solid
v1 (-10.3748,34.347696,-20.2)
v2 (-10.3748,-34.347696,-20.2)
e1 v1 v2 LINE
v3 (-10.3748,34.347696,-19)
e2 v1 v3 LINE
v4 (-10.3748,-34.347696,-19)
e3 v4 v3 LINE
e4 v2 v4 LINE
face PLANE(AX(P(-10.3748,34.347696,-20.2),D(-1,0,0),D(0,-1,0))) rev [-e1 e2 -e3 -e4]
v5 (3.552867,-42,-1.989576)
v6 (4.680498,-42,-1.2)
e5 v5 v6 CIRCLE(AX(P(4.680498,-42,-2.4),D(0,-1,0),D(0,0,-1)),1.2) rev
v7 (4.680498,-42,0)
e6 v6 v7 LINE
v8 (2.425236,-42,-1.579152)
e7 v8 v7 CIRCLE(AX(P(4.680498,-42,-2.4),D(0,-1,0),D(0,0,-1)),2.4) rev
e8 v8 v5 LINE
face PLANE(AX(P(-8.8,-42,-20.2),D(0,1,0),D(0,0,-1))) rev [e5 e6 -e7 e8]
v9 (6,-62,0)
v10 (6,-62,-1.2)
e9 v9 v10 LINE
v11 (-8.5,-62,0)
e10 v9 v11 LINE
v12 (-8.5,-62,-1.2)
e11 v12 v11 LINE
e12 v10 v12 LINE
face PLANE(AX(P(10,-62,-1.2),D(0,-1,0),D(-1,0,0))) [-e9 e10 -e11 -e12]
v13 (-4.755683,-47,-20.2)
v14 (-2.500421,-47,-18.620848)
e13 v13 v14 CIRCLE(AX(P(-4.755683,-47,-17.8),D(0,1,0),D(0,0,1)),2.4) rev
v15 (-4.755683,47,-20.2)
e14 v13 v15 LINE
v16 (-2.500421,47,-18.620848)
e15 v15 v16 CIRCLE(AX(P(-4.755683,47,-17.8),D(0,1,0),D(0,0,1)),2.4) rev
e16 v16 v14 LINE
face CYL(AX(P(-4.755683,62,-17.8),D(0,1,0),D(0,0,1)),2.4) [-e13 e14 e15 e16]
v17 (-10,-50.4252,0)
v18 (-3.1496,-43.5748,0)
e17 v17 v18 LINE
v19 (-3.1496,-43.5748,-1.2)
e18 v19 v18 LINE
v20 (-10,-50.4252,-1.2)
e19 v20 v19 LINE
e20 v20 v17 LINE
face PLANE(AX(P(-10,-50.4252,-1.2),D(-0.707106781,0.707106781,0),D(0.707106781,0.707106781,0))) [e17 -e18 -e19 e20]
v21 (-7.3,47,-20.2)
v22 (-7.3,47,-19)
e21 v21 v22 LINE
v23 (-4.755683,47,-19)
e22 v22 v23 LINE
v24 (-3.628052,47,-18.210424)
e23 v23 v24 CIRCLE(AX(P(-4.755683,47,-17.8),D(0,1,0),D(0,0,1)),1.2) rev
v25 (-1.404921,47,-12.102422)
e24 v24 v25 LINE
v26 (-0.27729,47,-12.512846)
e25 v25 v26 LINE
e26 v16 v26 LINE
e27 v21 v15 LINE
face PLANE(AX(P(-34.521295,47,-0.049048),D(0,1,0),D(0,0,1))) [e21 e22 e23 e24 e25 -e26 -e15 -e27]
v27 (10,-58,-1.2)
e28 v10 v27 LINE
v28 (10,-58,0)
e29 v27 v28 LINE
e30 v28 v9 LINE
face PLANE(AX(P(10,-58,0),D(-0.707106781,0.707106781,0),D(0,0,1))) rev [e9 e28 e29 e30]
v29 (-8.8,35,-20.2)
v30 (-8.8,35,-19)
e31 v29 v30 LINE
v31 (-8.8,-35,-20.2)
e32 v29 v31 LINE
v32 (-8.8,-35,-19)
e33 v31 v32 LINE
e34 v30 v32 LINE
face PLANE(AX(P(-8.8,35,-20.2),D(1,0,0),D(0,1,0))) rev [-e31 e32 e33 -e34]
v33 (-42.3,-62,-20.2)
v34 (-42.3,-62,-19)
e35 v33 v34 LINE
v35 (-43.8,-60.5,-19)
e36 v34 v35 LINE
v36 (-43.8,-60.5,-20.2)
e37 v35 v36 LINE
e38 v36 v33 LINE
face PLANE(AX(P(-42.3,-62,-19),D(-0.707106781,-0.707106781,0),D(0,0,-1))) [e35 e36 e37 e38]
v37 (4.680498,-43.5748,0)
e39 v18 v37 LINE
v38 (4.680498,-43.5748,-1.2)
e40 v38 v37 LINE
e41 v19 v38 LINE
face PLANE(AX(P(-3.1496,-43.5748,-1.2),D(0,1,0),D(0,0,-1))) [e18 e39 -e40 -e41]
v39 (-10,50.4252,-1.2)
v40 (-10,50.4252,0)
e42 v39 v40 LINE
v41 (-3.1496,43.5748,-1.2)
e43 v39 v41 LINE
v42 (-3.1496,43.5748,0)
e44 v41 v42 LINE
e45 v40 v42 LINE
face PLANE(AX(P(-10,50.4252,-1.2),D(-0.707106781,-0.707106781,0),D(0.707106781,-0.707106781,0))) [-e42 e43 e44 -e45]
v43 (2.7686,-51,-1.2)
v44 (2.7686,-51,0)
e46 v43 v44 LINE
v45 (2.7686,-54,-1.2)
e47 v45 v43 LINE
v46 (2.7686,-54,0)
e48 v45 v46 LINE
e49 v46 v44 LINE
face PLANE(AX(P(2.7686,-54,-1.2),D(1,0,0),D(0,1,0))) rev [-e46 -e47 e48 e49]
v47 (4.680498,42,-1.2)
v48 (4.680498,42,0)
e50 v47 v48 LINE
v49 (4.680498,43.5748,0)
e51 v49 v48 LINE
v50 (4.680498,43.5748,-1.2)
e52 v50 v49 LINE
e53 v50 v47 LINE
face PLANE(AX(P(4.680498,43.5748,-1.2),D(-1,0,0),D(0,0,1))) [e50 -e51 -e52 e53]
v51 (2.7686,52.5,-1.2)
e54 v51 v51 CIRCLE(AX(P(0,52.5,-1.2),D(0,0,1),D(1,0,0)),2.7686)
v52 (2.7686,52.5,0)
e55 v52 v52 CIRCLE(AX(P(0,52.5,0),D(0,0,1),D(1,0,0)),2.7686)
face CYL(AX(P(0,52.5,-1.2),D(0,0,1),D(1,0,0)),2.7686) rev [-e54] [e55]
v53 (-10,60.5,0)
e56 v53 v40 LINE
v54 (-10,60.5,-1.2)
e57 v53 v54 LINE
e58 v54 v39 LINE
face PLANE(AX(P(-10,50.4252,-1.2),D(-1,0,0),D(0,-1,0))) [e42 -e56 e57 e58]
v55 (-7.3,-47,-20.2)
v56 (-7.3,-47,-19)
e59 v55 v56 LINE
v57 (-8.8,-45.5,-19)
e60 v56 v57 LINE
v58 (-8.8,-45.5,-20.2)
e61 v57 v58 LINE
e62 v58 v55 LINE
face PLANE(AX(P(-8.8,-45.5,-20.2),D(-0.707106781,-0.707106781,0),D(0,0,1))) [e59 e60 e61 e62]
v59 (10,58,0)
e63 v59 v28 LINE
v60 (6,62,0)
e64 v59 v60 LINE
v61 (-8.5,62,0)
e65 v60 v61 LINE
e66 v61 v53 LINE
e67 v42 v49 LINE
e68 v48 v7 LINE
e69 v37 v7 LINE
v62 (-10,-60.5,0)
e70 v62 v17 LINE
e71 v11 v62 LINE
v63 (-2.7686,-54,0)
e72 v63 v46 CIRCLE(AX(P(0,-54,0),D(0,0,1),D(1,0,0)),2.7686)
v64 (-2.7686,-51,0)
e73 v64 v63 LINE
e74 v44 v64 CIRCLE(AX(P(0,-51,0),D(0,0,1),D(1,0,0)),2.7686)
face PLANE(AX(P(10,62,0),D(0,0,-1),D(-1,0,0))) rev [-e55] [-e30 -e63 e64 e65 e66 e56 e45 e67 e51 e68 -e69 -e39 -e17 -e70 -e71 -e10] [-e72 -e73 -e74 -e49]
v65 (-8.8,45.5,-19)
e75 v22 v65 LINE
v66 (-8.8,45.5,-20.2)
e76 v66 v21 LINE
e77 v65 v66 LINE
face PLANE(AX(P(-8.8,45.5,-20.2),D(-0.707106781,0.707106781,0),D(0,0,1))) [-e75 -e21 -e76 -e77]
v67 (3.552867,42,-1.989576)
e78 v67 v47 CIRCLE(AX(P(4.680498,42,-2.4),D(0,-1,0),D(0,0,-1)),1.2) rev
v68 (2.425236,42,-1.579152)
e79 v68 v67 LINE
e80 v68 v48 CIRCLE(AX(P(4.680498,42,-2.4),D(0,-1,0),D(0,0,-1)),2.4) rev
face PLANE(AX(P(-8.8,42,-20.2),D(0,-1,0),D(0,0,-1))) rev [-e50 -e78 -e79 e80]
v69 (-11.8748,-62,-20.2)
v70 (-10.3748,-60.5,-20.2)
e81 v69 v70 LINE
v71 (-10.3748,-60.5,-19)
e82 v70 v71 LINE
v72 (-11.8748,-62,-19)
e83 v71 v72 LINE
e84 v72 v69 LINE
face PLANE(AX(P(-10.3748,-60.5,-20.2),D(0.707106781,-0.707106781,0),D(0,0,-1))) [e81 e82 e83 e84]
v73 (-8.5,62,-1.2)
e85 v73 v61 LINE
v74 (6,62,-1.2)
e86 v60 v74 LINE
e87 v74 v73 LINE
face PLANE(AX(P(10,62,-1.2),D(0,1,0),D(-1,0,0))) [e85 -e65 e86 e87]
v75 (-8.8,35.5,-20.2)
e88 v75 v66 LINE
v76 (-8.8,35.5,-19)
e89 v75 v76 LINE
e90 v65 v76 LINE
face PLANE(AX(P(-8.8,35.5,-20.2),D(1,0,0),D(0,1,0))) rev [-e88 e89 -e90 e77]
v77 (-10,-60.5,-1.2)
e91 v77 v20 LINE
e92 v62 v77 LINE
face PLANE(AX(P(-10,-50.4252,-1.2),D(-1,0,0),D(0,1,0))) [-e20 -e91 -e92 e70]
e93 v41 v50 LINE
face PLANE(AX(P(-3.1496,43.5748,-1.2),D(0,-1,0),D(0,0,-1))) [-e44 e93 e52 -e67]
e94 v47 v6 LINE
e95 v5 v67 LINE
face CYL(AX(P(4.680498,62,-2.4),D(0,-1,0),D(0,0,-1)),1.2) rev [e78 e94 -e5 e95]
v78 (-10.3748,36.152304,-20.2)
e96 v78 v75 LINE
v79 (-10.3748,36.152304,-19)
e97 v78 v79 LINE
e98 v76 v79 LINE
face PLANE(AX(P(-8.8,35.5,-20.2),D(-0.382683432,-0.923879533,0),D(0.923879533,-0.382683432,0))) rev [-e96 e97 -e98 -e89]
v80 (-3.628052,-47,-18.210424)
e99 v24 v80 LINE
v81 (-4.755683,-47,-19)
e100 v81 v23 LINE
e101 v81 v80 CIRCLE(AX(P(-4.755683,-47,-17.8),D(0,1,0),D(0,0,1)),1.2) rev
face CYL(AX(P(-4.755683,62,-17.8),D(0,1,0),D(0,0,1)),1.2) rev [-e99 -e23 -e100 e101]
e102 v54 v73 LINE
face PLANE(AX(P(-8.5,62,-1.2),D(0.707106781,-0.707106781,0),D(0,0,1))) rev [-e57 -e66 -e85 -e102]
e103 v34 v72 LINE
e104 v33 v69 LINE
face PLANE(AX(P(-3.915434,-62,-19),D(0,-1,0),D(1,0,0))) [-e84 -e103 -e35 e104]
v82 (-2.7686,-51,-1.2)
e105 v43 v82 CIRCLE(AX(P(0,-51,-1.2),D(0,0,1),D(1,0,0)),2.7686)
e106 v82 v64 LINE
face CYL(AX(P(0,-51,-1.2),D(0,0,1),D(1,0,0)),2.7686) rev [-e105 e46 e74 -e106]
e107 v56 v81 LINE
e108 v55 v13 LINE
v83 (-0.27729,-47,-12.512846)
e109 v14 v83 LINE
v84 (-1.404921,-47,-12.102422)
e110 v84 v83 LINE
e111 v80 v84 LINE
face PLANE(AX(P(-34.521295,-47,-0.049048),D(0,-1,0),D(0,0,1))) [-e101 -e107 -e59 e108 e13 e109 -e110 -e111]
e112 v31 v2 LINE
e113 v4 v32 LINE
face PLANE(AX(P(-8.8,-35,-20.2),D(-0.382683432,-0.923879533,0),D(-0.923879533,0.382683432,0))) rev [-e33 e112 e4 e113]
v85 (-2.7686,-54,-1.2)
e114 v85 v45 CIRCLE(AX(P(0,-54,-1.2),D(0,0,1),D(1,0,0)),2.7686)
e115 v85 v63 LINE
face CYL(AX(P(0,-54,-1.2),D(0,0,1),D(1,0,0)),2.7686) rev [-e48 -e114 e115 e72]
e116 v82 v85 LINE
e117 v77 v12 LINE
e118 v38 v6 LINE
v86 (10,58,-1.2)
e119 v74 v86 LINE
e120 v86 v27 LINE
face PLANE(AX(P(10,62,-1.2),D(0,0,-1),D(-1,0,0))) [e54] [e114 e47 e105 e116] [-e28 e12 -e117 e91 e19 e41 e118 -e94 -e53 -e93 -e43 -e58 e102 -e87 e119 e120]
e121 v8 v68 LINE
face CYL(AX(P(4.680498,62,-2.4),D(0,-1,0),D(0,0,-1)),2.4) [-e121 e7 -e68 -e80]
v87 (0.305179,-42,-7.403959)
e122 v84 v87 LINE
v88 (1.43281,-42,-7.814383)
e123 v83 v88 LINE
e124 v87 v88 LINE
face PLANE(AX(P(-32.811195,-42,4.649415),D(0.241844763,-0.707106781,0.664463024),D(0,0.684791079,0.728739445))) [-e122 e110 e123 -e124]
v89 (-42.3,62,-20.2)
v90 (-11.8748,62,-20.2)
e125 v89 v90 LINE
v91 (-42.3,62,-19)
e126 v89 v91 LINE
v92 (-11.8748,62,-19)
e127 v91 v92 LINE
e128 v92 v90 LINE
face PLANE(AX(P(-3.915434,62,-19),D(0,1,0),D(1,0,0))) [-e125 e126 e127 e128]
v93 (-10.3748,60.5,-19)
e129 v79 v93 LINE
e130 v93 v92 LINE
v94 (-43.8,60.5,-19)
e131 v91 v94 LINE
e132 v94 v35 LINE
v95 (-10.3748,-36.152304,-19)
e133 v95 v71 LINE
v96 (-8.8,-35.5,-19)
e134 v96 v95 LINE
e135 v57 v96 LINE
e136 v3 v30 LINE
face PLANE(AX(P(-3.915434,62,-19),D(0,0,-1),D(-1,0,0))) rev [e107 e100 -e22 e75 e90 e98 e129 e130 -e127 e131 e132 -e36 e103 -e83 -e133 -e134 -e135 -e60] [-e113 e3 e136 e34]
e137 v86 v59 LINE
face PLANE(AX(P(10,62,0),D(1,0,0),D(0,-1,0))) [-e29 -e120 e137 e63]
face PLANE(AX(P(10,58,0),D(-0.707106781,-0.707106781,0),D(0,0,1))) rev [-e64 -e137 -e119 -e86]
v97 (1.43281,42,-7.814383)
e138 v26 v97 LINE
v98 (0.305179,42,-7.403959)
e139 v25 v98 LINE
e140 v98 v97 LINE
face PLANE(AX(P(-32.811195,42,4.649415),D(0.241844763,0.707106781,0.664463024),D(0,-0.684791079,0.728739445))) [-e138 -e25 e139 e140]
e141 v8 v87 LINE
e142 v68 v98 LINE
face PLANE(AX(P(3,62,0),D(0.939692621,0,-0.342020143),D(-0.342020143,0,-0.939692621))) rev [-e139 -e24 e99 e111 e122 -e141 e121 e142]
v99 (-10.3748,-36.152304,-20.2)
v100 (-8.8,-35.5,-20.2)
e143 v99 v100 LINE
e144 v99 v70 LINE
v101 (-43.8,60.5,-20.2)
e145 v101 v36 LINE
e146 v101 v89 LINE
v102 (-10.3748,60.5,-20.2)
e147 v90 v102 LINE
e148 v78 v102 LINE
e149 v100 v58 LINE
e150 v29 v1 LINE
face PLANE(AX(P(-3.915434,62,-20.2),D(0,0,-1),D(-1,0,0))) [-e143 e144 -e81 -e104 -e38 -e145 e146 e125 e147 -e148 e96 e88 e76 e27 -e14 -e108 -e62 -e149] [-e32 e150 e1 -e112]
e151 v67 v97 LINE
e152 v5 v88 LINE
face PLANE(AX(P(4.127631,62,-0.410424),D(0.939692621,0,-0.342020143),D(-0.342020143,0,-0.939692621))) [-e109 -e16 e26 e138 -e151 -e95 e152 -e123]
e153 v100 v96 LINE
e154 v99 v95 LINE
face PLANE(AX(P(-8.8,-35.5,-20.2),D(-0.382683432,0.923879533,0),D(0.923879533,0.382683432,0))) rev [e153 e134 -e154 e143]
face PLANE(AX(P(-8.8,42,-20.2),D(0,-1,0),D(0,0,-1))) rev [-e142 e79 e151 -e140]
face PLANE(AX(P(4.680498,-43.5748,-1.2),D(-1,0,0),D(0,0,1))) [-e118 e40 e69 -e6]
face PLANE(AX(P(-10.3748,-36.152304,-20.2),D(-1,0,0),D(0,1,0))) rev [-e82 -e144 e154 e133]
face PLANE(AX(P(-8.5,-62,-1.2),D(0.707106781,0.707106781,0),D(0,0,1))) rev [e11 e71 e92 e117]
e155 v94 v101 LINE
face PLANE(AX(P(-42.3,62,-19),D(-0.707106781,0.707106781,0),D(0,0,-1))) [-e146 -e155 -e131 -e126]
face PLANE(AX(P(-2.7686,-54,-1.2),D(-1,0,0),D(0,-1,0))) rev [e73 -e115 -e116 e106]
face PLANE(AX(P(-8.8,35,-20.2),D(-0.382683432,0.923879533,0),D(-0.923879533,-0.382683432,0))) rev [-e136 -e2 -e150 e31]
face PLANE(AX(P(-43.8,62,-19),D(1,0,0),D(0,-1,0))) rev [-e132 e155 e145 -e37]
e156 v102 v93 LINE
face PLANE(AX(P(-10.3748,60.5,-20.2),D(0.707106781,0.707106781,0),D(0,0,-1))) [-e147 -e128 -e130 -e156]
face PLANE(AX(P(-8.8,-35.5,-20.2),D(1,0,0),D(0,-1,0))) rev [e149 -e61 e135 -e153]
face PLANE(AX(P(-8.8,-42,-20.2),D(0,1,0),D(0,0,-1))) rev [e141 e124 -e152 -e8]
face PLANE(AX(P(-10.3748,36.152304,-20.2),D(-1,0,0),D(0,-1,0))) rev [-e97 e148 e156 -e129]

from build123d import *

# Parameters (mm, degrees)
BOSS_EXTRUDE1_DEPTH            = 62
CONVERT_SOLID1_DEPTH           = 62
CONVERT_SOLID1_2_DEPTH         = 62
CUT_EXTRUDE2_DEPTH             = 79.552402891
SKETCH9_W                      = 18.8
SKETCH9_H                      = 20
CUT_EXTRUDE3_DEPTH             = 79.552402891
BOSS_EXTRUDE3_DEPTH            = 1.2
BOSS_EXTRUDE4_DEPTH            = 20
CUT_EXTRUDE4_DEPTH             = 20.58
CUT_EXTRUDE4_DIRECTION_2_REACH = 81.822
CHAMFER4_SIZE                  = 4
CHAMFER1_SIZE                  = 1.5
SKETCH7_R                      = 2.7686
CUT_EXTRUDE1_DEPTH             = 1.2


# Read off the part's stored shape, not the designer's step: Convert-Solid1
with BuildPart() as part:
    # Sketch2 → Boss-Extrude1 (new body)
    with BuildSketch(Plane(origin=(0, 0, 0), x_dir=(1, 0, 0), z_dir=(0, 1, 0))):
        Polygon((10, 0), (3, 0), (-3.915434451, 19), (-43.8, 19), (-43.8, 40), (10, 40), align=None)
    extrude(amount=BOSS_EXTRUDE1_DEPTH)

    # Convert-Solid1 outline → Convert-Solid1 (cut)
    with BuildSketch(Plane(origin=(0, 0, 0), x_dir=(1, 0, 0), z_dir=(0, 1, 0))):
        with BuildLine():
            ThreePointArc((4.680498092, 0), (3.303914645, 0.434035094), (2.425235802, 1.579151656))
            Line((2.425235802, 1.579151656), (3, 0))
            Line((3, 0), (4.680498092, 0))
        make_face()
        with BuildLine():
            Line((-43.8, 40), (-43.8, 20.2))
            Line((-43.8, 20.2), (-4.755683497, 20.2))
            ThreePointArc((-4.755683497, 20.2), (-3.37910005, 19.765964906), (-2.500421207, 18.620848344))
            Line((-2.500421207, 18.620848344), (3.552866947, 1.989575828))
            ThreePointArc((3.552866947, 1.989575828), (3.992206368, 1.417017547), (4.680498092, 1.2))
            Line((4.680498092, 1.2), (10, 1.2))
            Line((10, 1.2), (10, 40))
            Line((10, 40), (-43.8, 40))
        make_face()
    extrude(amount=CONVERT_SOLID1_DEPTH, mode=Mode.SUBTRACT)

    # Convert-Solid1 2 outline → Convert-Solid1 2 (add)
    with BuildSketch(Plane(origin=(0, 0, 0), x_dir=(1, 0, 0), z_dir=(0, 1, 0))):
        with BuildLine():
            ThreePointArc((-4.755683497, 19), (-4.067391773, 18.782982453), (-3.628052352, 18.210424172))
            Line((-3.628052352, 18.210424172), (-3.915434451, 19))
            Line((-3.915434451, 19), (-4.755683497, 19))
        make_face()
    extrude(amount=CONVERT_SOLID1_2_DEPTH)

    # Sketch8 → Cut-Extrude2 (cut, through all)
    with BuildSketch(Plane.XY):
        Polygon((-8.8, 35), (-10.3748, 34.347696482), (-10.3748, -34.347696482), (-8.8, -35), align=None)
        Polygon((-8.8, 35.5), (-10.3748, 36.152303518), (-10.3748, 75), (-8.8, 75), align=None)
        Polygon((-10.3748, -36.152303518), (-10.3748, -75), (-8.8, -75), (-8.8, -35.5), align=None)
    extrude(amount=-CUT_EXTRUDE2_DEPTH, mode=Mode.SUBTRACT)

    # Sketch9 → Cut-Extrude3 (cut, through all)
    with BuildSketch(Plane.XY):
        with Locations((0.6, 52)):
            Rectangle(SKETCH9_W, SKETCH9_H)
    extrude(amount=-CUT_EXTRUDE3_DEPTH, mode=Mode.SUBTRACT)

    # Sketch11 → Boss-Extrude3 (add)
    with BuildSketch(Plane.XY):
        Polygon((-3.1496, 43.5748), (4.680498092, 43.5748), (4.680498092, 42), (10, 42), (10, 62), (-10, 62), (-10, 50.4252), align=None)
    extrude(amount=-BOSS_EXTRUDE3_DEPTH)

    # Sketch12 → Boss-Extrude4 (add)
    with BuildSketch(Plane(origin=(0, 42, 0), x_dir=(1, 0, 0), z_dir=(0, 1, 0))):
        with BuildLine():
            Line((-3.628052352, 18.210424172), (0.305179296, 7.403959033))
            Line((0.305179296, 7.403959033), (1.432810441, 7.814383205))
            Line((1.432810441, 7.814383205), (-2.500421207, 18.620848344))
            ThreePointArc((-2.500421207, 18.620848344), (-3.37910005, 19.765964906), (-4.755683497, 20.2))
            Line((-4.755683497, 20.2), (-8.8, 20.2))
            Line((-8.8, 20.2), (-8.8, 19))
            Line((-8.8, 19), (-4.755683497, 19))
            ThreePointArc((-4.755683497, 19), (-4.067391773, 18.782982453), (-3.628052352, 18.210424172))
        make_face()
    extrude(amount=BOSS_EXTRUDE4_DEPTH)

    # Sketch13 → Cut-Extrude4 (cut)
    with BuildSketch(Plane(origin=(2.649066665, 0, -0.964181415), x_dir=(0.34202014332566943, 0, 0.9396926207859082), z_dir=(-0.9396926207859082, 0, 0.34202014332566943))):
        Polygon((-6.853068201, 42), (-11.853068201, 47), (-26.853068201, 47), (-26.853068201, 62), (-6.853068201, 62), align=None)
    extrude(amount=-CUT_EXTRUDE4_DEPTH, mode=Mode.SUBTRACT)

    # Cut-Extrude4 direction 2: up to this plane
    cut_extrude4_direction_2_end = Plane(origin=(-8.8, 35.5, -20.2), z_dir=(1, 0, 0))
    # Sketch13 → Cut-Extrude4 direction 2 (cut, up to the surface)
    with BuildSketch(Plane(origin=(2.649066665, 0, -0.964181415), x_dir=(0.34202014332566943, 0, 0.9396926207859082), z_dir=(-0.9396926207859082, 0, 0.34202014332566943)), mode=Mode.PRIVATE) as cut_extrude4_direction_2_sk1:
        Polygon((-6.853068201, 42), (-11.853068201, 47), (-26.853068201, 47), (-26.853068201, 62), (-6.853068201, 62), align=None)
    cut_extrude4_direction_2_tool1 = split(extrude(cut_extrude4_direction_2_sk1.sketch, amount=CUT_EXTRUDE4_DIRECTION_2_REACH, mode=Mode.PRIVATE), bisect_by=cut_extrude4_direction_2_end, keep=Keep.BOTH, mode=Mode.PRIVATE)
    add(cut_extrude4_direction_2_tool1.solids().sort_by_distance((-3.001015, 54.133333, -16.487654))[0], mode=Mode.SUBTRACT)

    # Chamfer4
    chamfer4_edges = [part.edges().sort_by_distance(p)[0] for p in [
        (10, 62, -0.6),
    ]]
    chamfer(chamfer4_edges, length=CHAMFER4_SIZE)

    # Chamfer1
    chamfer1_edges = [part.edges().sort_by_distance(p)[0] for p in [
        (-10, 62, -0.6),
        (-8.8, 47, -19.6),
        (-43.8, 62, -19.6),
        (-10.3748, 62, -19.6),
    ]]
    chamfer(chamfer1_edges, length=CHAMFER1_SIZE)

    # Mirror1: part across plane


with BuildPart() as part_1:
    add(part.part)
    add(part.part.mirror(Plane(origin=(10, 0, 0), x_dir=(0, 0, 1), z_dir=(0, 1, 0))))

    # Sketch7 → Cut-Extrude1 (cut)
    with BuildSketch(Plane.XY):
        with Locations((0, 52.5)):
            Circle(SKETCH7_R)
        with BuildLine():
            Line((-2.7686, -54), (-2.7686, -51))
            ThreePointArc((-2.7686, -51), (0, -48.2314), (2.7686, -51))
            Line((2.7686, -51), (2.7686, -54))
            ThreePointArc((2.7686, -54), (0, -56.7686), (-2.7686, -54))
        make_face()
    extrude(amount=-CUT_EXTRUDE1_DEPTH, mode=Mode.SUBTRACT)


solid = part_1.part
